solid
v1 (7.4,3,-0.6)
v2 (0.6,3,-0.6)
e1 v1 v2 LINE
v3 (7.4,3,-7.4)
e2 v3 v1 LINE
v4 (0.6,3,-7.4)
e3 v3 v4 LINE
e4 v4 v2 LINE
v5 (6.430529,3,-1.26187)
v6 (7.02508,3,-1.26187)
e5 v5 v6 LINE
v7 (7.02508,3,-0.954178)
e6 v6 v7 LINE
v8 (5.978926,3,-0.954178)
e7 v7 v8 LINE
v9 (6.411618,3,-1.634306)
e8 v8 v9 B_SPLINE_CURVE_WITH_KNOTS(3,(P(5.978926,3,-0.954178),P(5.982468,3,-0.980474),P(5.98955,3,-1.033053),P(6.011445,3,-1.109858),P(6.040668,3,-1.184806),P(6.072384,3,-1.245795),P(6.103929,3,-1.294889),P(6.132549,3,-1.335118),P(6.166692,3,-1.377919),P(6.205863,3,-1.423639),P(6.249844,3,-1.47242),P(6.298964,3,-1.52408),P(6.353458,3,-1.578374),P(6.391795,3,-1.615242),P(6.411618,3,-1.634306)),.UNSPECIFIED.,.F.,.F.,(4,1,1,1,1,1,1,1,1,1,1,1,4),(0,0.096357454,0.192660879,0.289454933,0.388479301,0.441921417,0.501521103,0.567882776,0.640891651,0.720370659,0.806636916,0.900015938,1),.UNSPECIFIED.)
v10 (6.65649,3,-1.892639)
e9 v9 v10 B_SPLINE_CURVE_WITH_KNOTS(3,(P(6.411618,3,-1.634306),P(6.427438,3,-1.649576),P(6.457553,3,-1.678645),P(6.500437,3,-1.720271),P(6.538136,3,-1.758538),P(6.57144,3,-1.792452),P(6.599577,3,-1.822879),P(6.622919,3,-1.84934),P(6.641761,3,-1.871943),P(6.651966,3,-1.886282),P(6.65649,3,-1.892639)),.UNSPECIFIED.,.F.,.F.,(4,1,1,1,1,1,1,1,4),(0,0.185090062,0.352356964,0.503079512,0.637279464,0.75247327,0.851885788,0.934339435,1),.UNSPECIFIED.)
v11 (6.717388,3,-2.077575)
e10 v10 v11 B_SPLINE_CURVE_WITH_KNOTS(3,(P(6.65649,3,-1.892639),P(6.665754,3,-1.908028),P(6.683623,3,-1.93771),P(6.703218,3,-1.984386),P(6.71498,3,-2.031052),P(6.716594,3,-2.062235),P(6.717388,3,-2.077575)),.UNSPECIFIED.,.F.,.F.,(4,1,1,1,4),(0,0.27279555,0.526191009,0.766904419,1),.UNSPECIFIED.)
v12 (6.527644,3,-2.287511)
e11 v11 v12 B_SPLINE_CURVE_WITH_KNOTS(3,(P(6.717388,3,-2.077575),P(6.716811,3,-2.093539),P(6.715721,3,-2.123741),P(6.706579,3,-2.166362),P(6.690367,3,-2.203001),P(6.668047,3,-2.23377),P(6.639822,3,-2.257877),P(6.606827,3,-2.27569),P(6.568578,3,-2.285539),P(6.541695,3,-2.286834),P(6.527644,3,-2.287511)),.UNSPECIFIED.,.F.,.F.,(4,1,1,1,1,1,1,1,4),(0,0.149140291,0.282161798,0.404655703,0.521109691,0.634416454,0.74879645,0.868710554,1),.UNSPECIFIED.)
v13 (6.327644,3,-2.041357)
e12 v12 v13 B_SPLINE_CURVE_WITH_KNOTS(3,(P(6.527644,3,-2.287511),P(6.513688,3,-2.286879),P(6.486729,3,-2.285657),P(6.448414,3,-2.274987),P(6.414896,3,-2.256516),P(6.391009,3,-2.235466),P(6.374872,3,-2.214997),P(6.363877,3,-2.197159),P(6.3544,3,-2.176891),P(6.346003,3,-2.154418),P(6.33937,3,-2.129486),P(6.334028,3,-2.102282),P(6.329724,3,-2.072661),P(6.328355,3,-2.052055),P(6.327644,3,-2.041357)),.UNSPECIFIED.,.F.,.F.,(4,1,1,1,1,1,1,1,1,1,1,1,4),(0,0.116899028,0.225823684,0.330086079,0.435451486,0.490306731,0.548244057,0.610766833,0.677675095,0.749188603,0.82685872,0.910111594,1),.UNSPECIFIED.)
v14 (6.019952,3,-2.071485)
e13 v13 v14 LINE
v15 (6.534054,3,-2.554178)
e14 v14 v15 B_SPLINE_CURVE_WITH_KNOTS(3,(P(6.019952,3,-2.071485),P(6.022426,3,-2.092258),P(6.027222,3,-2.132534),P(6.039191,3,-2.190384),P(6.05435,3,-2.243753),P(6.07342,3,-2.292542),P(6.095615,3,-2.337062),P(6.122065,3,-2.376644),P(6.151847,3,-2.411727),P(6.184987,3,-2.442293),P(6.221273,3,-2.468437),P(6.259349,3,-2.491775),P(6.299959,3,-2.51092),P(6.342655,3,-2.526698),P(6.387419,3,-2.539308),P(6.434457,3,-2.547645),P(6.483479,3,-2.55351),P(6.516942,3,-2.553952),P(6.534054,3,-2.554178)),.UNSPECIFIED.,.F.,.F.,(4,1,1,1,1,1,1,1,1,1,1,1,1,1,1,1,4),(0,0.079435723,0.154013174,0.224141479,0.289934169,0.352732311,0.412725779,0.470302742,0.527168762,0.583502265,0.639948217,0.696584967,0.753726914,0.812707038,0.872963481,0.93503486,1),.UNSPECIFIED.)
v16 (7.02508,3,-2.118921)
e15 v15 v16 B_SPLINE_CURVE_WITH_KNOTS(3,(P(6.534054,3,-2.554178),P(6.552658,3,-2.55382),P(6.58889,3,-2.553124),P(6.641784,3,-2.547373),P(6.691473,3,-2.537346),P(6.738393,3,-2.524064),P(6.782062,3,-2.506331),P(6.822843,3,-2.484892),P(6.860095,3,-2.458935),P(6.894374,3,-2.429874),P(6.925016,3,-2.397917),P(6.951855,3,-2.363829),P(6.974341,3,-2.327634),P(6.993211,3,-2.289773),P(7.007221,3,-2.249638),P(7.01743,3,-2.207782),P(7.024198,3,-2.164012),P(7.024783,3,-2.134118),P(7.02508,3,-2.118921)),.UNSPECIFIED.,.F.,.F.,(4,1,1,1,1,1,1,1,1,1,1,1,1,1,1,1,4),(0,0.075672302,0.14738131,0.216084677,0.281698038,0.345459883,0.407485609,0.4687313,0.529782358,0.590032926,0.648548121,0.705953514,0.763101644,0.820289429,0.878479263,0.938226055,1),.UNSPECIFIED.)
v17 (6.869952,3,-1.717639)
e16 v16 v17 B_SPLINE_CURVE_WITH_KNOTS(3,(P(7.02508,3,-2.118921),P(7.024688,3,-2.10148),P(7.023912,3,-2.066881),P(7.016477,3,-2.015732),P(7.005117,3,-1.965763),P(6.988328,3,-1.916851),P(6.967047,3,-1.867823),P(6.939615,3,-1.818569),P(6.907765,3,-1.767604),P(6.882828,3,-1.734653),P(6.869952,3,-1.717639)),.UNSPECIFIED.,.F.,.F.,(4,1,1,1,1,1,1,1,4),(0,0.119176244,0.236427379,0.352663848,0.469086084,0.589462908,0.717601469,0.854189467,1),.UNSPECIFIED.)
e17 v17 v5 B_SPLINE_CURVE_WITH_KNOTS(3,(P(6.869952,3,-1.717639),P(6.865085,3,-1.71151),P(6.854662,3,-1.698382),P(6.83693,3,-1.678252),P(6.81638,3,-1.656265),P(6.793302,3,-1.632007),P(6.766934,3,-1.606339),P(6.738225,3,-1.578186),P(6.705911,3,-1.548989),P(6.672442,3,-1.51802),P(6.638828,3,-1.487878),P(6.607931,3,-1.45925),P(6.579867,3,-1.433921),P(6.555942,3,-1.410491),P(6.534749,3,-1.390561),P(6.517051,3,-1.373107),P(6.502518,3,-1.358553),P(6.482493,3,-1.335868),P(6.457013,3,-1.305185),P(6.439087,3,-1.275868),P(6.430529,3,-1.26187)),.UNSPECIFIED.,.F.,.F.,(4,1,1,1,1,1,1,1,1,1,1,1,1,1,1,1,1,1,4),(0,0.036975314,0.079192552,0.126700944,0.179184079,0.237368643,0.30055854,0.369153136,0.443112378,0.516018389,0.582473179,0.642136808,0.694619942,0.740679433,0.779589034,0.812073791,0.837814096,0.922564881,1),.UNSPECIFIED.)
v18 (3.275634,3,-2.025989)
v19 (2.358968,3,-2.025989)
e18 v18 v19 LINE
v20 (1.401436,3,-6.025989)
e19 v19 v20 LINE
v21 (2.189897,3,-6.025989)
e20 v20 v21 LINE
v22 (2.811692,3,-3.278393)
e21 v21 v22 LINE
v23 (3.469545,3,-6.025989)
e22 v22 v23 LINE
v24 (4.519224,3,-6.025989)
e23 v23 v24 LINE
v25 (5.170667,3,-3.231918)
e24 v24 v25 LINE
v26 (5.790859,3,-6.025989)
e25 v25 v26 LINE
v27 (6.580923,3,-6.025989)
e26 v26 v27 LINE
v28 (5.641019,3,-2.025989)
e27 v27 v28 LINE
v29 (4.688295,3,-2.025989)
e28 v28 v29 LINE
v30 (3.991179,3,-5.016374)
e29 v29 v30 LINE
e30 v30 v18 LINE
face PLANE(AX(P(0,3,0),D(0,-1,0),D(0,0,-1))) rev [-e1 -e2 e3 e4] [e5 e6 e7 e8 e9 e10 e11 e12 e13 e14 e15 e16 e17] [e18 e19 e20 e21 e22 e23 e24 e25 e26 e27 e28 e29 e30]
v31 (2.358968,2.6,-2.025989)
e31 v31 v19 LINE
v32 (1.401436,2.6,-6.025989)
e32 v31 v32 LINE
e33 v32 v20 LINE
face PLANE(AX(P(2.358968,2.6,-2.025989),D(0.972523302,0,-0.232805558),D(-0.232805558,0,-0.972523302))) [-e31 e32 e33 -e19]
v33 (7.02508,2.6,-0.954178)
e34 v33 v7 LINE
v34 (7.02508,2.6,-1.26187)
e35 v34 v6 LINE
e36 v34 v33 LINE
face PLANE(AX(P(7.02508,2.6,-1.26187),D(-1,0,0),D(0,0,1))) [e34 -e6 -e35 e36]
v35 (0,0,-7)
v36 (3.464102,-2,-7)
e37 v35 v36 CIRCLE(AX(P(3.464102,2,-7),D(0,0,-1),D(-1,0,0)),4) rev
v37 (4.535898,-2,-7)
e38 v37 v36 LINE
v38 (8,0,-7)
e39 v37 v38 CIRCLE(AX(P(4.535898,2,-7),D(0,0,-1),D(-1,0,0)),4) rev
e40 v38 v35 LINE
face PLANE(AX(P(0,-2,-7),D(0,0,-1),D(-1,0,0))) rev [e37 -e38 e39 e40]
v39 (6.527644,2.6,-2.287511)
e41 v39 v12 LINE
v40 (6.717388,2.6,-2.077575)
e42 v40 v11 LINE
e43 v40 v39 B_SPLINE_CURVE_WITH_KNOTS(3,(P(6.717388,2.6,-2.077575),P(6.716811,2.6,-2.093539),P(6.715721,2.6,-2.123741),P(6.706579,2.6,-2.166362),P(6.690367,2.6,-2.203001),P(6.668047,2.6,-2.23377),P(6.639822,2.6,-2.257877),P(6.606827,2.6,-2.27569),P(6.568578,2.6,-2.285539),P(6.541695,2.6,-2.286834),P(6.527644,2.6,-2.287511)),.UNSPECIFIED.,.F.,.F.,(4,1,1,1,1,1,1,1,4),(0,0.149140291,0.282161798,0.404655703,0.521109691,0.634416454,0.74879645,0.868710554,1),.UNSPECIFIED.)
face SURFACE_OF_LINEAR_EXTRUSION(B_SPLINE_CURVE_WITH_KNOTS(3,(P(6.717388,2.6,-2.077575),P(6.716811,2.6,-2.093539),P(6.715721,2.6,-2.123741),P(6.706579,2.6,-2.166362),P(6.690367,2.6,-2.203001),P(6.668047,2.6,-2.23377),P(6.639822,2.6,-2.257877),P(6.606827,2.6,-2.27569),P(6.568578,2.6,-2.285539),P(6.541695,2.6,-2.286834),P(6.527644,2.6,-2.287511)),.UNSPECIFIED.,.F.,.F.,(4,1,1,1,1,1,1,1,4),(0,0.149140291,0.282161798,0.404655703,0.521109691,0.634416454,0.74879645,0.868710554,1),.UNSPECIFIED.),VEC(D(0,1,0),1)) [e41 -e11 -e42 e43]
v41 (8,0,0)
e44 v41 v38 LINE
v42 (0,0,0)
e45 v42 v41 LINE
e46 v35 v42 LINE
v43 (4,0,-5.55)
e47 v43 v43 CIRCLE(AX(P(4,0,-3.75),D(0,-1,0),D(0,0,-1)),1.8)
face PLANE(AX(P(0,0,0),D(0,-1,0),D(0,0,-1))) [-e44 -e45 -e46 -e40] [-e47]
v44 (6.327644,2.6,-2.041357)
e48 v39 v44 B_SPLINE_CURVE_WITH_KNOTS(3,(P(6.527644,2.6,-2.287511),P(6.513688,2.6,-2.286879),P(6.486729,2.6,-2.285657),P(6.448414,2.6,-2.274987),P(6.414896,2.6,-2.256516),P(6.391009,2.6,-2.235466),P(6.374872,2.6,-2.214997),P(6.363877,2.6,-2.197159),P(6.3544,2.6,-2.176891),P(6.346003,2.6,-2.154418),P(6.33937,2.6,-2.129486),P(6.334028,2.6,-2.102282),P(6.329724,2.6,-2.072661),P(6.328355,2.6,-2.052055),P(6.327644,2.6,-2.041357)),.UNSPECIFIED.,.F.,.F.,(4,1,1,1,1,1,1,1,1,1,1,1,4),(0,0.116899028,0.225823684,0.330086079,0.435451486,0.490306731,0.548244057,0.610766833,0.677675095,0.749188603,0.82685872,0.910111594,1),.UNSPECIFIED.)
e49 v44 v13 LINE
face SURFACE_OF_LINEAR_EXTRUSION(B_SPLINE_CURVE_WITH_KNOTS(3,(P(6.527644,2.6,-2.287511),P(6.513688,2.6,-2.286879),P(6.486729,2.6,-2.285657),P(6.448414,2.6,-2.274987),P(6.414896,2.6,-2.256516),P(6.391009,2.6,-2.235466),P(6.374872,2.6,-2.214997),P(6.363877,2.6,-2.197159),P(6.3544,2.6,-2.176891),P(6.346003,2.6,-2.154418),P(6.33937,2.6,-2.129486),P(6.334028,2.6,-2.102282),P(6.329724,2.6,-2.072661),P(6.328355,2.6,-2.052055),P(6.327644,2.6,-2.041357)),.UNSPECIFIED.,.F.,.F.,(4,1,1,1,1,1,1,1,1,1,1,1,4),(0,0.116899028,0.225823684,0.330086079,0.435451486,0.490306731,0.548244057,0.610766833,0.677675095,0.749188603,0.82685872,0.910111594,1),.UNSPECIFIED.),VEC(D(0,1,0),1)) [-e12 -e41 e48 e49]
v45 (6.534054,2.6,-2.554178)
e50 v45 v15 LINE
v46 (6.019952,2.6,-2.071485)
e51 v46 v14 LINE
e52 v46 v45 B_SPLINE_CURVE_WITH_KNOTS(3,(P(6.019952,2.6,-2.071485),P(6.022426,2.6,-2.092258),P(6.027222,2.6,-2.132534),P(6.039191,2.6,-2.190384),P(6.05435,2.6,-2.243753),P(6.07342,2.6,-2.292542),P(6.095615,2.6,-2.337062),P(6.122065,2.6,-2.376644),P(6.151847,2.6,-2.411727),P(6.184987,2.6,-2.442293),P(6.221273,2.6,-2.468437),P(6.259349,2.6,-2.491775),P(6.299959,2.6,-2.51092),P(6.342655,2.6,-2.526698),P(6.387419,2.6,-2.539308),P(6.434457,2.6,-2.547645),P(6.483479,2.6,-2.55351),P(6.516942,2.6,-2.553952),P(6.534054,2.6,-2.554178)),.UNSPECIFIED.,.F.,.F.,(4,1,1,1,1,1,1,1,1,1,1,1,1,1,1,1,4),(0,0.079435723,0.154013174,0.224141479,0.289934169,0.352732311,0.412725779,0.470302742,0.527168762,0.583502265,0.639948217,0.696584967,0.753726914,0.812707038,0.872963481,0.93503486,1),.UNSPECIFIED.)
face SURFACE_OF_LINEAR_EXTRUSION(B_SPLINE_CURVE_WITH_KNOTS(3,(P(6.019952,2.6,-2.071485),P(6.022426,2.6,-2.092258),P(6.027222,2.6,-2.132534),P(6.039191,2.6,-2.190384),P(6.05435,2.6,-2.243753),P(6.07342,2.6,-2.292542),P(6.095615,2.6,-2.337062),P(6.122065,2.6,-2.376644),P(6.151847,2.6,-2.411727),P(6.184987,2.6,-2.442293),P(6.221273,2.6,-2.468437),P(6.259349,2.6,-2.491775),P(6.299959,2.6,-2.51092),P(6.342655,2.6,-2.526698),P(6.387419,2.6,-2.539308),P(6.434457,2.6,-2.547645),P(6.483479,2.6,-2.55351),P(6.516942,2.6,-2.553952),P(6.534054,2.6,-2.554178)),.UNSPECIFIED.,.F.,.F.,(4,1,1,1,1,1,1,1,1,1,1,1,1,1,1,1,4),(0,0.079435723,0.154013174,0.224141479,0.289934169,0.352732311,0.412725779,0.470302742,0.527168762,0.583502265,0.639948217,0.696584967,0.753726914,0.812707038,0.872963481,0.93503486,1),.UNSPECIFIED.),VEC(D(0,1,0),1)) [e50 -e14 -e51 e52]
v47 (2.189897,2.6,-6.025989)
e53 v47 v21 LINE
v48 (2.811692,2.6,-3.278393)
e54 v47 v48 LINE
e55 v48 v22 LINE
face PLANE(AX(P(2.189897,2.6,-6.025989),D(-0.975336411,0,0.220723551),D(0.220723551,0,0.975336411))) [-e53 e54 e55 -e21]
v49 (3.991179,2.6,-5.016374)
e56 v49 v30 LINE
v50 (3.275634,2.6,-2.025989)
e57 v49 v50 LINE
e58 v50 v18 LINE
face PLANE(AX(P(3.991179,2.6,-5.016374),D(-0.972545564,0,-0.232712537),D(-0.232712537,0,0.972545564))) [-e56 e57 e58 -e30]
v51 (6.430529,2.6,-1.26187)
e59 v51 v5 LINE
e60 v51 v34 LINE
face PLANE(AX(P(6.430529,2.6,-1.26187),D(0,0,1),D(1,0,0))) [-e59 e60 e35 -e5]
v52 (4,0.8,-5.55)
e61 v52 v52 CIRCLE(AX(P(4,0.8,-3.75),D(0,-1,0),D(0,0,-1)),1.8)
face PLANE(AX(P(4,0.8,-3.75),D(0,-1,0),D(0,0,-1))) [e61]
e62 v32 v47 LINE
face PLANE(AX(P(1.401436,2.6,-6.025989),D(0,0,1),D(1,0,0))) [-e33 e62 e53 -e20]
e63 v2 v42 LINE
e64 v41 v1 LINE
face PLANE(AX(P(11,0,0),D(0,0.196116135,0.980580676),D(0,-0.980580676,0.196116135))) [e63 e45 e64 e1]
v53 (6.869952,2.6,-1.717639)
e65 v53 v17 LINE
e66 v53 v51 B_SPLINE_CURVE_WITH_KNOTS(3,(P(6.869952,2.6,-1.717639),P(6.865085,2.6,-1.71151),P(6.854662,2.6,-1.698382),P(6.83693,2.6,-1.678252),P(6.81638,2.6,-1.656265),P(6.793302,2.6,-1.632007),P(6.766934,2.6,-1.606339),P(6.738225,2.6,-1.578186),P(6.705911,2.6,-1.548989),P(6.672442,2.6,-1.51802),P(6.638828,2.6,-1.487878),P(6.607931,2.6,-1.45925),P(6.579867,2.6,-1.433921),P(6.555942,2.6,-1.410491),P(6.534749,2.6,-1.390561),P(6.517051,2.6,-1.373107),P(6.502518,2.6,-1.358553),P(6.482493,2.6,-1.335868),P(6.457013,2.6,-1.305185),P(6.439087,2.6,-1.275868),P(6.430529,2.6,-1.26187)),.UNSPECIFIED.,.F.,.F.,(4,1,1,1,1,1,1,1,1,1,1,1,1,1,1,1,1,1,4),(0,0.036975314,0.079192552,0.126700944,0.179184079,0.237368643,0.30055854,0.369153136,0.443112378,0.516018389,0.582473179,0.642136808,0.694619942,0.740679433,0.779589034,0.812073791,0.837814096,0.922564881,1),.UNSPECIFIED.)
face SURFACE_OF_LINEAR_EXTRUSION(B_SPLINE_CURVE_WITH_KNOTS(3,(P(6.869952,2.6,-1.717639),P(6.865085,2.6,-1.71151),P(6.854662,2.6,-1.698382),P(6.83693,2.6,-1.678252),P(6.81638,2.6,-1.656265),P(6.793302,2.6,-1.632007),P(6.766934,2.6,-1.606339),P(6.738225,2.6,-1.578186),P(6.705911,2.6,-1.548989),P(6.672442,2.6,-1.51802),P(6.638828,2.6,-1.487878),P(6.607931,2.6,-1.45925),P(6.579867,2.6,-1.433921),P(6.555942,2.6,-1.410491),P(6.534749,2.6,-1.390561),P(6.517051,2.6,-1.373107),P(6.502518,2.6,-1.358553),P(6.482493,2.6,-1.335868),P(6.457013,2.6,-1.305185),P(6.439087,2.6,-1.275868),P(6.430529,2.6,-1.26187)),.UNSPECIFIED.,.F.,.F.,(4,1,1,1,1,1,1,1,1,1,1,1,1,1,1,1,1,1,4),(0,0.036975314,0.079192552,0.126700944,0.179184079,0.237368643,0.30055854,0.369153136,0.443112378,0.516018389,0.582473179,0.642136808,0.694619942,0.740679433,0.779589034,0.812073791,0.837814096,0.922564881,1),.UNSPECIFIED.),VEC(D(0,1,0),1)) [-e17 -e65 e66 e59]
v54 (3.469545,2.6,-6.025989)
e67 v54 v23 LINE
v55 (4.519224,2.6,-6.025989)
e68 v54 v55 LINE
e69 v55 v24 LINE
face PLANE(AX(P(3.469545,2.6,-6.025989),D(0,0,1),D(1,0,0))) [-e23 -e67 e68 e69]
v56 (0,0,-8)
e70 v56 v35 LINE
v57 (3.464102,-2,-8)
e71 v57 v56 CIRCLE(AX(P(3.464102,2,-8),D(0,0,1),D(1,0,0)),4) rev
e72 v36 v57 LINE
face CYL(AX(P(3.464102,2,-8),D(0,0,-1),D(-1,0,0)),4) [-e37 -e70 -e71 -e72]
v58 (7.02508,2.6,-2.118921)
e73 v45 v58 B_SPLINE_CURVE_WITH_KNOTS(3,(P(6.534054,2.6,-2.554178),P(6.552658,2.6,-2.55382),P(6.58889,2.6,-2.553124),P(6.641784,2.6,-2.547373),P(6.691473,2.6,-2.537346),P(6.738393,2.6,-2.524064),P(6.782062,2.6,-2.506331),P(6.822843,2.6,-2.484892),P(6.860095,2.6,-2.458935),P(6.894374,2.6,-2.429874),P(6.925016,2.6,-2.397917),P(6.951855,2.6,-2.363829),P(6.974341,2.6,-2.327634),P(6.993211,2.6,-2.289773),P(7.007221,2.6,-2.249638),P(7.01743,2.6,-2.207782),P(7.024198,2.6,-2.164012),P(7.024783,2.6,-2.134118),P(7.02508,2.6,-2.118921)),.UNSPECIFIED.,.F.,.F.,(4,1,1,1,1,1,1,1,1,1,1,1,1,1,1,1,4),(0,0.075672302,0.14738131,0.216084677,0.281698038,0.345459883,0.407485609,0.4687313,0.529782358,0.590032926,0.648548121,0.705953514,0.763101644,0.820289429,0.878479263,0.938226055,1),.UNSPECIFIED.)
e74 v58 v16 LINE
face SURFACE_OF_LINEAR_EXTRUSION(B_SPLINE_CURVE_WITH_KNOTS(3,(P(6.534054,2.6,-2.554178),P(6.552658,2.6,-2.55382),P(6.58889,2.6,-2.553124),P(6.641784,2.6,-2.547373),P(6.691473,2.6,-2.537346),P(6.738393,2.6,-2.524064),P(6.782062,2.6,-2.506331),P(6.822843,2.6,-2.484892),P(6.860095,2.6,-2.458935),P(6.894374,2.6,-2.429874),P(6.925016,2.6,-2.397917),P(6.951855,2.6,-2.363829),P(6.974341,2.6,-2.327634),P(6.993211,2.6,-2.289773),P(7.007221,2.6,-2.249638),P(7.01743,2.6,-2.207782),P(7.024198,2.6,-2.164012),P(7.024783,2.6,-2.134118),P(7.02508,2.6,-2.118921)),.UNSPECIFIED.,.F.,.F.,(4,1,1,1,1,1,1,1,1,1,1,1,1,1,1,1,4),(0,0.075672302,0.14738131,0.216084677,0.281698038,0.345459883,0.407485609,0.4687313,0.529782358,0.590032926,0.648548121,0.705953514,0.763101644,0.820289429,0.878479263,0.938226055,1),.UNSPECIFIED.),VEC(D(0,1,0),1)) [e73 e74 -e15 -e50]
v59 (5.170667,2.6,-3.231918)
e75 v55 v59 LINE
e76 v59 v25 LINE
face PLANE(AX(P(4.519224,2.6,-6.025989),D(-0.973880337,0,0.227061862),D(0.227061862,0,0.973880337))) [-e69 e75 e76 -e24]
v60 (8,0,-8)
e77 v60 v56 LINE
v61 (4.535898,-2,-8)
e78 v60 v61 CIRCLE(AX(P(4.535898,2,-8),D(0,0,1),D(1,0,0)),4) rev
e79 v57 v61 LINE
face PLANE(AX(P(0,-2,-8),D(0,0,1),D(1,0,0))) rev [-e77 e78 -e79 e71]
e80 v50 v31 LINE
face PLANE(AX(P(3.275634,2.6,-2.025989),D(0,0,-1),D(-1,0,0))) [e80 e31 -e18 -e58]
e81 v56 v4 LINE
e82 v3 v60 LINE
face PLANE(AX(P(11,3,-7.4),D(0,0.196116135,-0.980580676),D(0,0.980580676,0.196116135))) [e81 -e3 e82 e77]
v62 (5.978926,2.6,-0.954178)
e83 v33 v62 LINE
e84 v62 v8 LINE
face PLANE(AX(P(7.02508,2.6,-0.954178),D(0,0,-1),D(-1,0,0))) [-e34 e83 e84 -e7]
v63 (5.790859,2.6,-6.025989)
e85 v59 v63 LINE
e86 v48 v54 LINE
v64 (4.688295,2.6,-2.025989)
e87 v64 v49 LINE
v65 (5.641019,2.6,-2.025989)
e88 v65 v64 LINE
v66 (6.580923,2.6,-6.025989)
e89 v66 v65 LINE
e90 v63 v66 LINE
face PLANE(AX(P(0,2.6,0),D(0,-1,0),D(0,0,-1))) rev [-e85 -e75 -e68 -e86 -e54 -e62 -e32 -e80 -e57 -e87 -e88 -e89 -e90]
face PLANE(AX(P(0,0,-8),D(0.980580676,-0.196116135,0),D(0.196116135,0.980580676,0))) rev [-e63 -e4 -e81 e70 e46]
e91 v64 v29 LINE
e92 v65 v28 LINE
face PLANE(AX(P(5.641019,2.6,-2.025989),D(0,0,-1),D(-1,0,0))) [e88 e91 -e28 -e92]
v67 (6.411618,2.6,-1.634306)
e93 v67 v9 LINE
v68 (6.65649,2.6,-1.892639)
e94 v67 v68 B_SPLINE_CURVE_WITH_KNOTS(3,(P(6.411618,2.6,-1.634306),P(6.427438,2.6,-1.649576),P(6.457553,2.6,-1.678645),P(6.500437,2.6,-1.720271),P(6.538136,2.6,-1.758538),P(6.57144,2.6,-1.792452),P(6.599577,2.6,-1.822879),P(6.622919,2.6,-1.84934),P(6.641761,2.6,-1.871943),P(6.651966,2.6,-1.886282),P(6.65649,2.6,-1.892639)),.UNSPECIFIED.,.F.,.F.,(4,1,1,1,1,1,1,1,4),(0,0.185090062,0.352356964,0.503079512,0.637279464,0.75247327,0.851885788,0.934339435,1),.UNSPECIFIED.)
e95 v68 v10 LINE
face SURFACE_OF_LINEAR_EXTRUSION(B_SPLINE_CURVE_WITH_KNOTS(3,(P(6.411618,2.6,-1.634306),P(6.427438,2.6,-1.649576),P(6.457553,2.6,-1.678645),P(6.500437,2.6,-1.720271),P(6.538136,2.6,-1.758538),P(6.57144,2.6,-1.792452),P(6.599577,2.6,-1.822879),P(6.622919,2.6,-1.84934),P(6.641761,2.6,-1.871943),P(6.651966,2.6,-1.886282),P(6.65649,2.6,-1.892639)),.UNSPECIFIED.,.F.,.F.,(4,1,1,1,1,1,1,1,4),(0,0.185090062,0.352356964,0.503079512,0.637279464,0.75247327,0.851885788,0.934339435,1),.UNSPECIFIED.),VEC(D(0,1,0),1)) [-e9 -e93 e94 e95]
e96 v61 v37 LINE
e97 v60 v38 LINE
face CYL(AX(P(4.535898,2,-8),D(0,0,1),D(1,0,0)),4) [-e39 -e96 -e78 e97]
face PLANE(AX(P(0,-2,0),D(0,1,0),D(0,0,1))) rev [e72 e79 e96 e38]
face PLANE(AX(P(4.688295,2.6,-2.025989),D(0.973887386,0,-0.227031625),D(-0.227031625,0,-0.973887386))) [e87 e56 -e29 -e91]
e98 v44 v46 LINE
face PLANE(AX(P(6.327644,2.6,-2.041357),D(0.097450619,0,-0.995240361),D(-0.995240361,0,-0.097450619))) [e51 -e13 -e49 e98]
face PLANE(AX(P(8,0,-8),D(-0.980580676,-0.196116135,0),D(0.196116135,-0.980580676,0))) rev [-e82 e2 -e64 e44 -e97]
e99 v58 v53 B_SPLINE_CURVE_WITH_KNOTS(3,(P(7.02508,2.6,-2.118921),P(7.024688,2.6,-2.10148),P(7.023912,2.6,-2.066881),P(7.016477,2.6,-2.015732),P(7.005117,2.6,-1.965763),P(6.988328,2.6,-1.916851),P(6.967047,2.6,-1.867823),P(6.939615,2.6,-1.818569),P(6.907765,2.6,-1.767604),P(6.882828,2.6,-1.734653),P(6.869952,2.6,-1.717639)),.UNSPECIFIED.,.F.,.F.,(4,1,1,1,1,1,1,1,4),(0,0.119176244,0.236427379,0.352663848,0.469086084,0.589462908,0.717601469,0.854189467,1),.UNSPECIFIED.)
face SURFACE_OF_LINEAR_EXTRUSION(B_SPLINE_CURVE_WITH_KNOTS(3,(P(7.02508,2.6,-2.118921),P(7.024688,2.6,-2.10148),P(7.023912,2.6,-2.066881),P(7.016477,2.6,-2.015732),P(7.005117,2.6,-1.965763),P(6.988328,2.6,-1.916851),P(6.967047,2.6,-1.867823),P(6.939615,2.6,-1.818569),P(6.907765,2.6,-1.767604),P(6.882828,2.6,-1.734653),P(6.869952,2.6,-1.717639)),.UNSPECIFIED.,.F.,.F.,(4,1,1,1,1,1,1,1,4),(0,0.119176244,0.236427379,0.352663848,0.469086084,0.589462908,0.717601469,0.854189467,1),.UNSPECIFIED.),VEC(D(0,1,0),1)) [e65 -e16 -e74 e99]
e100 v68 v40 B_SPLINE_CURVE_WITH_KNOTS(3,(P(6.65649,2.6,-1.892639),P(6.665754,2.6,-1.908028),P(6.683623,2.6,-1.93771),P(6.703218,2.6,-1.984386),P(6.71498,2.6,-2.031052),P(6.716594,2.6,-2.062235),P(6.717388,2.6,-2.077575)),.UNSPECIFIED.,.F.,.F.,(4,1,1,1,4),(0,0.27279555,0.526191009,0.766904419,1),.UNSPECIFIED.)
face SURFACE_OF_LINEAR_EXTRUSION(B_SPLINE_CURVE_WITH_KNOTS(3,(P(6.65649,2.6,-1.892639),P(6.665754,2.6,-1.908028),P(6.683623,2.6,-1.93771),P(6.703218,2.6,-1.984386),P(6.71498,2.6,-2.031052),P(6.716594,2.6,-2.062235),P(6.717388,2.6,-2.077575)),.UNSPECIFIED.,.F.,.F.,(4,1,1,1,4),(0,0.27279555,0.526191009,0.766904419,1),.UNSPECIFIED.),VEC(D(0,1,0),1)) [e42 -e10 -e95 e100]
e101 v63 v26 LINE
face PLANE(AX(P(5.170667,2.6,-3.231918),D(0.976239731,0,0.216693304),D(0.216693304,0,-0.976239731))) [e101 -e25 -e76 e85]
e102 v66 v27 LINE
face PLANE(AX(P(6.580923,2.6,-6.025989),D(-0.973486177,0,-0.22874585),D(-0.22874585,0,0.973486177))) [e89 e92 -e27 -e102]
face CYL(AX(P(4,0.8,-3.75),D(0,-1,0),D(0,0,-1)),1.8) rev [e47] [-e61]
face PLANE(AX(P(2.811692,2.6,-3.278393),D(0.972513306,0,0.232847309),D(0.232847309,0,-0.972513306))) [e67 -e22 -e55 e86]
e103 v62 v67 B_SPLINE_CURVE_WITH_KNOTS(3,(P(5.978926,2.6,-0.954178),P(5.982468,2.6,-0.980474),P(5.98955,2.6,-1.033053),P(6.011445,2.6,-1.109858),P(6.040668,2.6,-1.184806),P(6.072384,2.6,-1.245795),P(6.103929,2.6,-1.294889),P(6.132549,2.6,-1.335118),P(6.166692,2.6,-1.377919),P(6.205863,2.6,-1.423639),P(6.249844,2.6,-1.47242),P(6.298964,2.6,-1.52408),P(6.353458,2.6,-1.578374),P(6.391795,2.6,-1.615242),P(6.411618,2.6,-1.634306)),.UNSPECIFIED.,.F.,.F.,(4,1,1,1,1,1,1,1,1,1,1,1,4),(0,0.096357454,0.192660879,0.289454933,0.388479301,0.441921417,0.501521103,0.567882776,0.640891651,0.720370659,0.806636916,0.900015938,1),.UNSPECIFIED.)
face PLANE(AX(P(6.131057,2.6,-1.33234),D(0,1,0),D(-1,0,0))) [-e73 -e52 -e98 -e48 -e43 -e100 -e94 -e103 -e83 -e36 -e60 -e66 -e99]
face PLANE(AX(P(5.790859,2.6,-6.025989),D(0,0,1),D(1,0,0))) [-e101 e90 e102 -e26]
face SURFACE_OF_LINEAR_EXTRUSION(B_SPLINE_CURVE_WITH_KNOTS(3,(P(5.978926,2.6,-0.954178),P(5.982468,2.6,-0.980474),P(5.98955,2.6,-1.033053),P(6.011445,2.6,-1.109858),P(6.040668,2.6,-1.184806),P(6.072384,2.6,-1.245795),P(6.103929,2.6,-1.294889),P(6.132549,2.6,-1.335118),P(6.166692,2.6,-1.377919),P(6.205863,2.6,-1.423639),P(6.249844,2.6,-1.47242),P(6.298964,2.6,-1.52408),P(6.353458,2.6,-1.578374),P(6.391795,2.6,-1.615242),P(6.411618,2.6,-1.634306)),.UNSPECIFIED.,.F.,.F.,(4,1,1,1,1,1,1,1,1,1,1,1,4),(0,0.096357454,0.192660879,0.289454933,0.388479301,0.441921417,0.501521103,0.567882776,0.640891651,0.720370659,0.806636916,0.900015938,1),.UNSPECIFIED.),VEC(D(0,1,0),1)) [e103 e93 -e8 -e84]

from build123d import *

# Parameters (mm, degrees)
SKETCH1_W               = 8
SKETCH1_H               = 8
BOSS_EXTRUDE1_DEPTH     = 3
CUT_EXTRUDE1_DEPTH      = 12.704699911
CUT_EXTRUDE1_DEPTH_BACK = 12.704699911
CUT_EXTRUDE2_DEPTH      = 11
SKETCH4_R               = 1.8
CUT_EXTRUDE3_DEPTH      = 0.8
SKETCH5_W               = 8
SKETCH5_H               = 1
BOSS_EXTRUDE2_DEPTH     = 2
FILLET1_R               = 4
CUT_EXTRUDE4_DEPTH      = 0.4
CUT_EXTRUDE5_DEPTH      = 0.4


with BuildPart() as part:
    # Sketch1 → Boss-Extrude1 (new body)
    with BuildSketch(Plane(origin=(0, 0, 0), x_dir=(1, 0, 0), z_dir=(0, 1, 0))):
        with Locations((4, 4)):
            Rectangle(SKETCH1_W, SKETCH1_H)
    extrude(amount=BOSS_EXTRUDE1_DEPTH)

    # Sketch2 → Cut-Extrude1 (cut, two sides: drawn at the far end of the back side and taken through both)
    with BuildSketch(Plane.XY.offset(-CUT_EXTRUDE1_DEPTH_BACK)):
        Polygon((0, 0), (0.6, 3), (0, 3), align=None)
        Polygon((8, 0), (7.4, 3), (8, 3), align=None)
    extrude(amount=CUT_EXTRUDE1_DEPTH + CUT_EXTRUDE1_DEPTH_BACK, mode=Mode.SUBTRACT)

    # Sketch3 → Cut-Extrude2 (cut)
    with BuildSketch(Plane(origin=(0, 0, 0), x_dir=(0, 0, -1), z_dir=(1, 0, 0))):
        Polygon((0, 0), (0.6, 3), (0, 3), align=None)
        Polygon((8, 3), (7.4, 3), (8, 0), align=None)
    extrude(amount=CUT_EXTRUDE2_DEPTH, mode=Mode.SUBTRACT)

    # Sketch4 → Cut-Extrude3 (cut)
    with BuildSketch(Plane.XZ):
        with Locations(Location((4, -3.75, 0), (0, 0, 270))):
            Circle(SKETCH4_R)
    extrude(amount=-CUT_EXTRUDE3_DEPTH, mode=Mode.SUBTRACT)

    # Sketch5 → Boss-Extrude2 (add)
    with BuildSketch(Plane.XZ):
        with Locations((4, -7.5)):
            Rectangle(SKETCH5_W, SKETCH5_H)
    extrude(amount=BOSS_EXTRUDE2_DEPTH)

    # Fillet1
    # the kernel refuses this fillet: 4 mm, written as the material it takes off along each edge
    with BuildSketch(Plane(origin=(8, -2, -16.660254038), x_dir=(0, 1, 0), z_dir=(0, 0, 1)), Plane(origin=(0, -2, 1.660254038), x_dir=(0, 1, 0), z_dir=(0, 0, -1))) as fillet1_piece_1:
        with BuildLine():
            CenterArc((4, 3.464101615), FILLET1_R, 180, 60)
            Line((0, 3.464101615), (-0.08, 3.464101615))
            Line((-0.08, 3.464101615), (-0.08, 0))
            Line((-0.08, 0), (0, -0.08))
            ThreePointArc((0, -0.08), (1, -0.08), (1.96, -0.069282032))
            Line((1.96, -0.069282032), (2, 0))
        make_face()
    extrude(amount=18.320508076, mode=Mode.SUBTRACT)

    # Sketch6 → Cut-Extrude4 (cut)
    with BuildSketch(Plane(origin=(0, 3, 0), x_dir=(1, 0, 0), z_dir=(0, 1, 0))):
        Polygon((2.358967796, 2.025988971), (1.401435745, 6.025988971), (2.189897284, 6.025988971), (2.811692155, 3.278392817), (3.469544719, 6.025988971), (4.519224207, 6.025988971), (5.170666514, 3.231918458), (5.790858822, 6.025988971), (6.580922925, 6.025988971), (5.641019078, 2.025988971), (4.688294719, 2.025988971), (3.991179335, 5.016373586), (3.275634463, 2.025988971), align=None)
    extrude(amount=-CUT_EXTRUDE4_DEPTH, mode=Mode.SUBTRACT)

    # Sketch7 → Cut-Extrude5 (cut)
    with BuildSketch(Plane(origin=(0, 3, 0), x_dir=(1, 0, 0), z_dir=(0, 1, 0))):
        with BuildLine():
            Line((7.025079926, 1.261869909), (7.025079926, 0.954177602))
            Line((7.025079926, 0.954177602), (5.978926079, 0.954177602))
            add(Edge.make_bspline(
                [(5.978926079, 0.954177602), (5.982468114, 0.980474374), (5.989550197, 1.033053173), (6.011445466, 1.109857564), (6.040668149, 1.184805528), (6.072383822, 1.245794978), (6.103928572, 1.294889387), (6.132549124, 1.335117725), (6.166692393, 1.37791895), (6.205862922, 1.423638586), (6.249844239, 1.472419552), (6.298964472, 1.524080492), (6.353457933, 1.578374089), (6.391795053, 1.615242112), (6.411618387, 1.634305807)],
                knots=[0, 0, 0, 0, 1.156289446, 2.311930546, 3.473459201, 4.661751613, 5.303057008, 6.018253237, 6.81459331, 7.690699809, 8.644447906, 9.679642995, 10.800191253, 12, 12, 12, 12], degree=3))
            add(Edge.make_bspline(
                [(6.411618387, 1.634305807), (6.427437635, 1.649575712), (6.457552822, 1.678645113), (6.500436909, 1.720271317), (6.538136439, 1.758537631), (6.571439659, 1.79245241), (6.599577217, 1.822879209), (6.622919237, 1.849340182), (6.641761343, 1.871943086), (6.651966244, 1.886282382), (6.656490182, 1.89263914)],
                knots=[0, 0, 0, 0, 1.480720495, 2.818855715, 4.024636094, 5.098235712, 6.019786162, 6.815086302, 7.474715479, 8, 8, 8, 8], degree=3))
            add(Edge.make_bspline(
                [(6.656490182, 1.89263914), (6.665754103, 1.908027503), (6.683623134, 1.937709873), (6.703218009, 1.984385935), (6.714979583, 2.031052356), (6.71659359, 2.062234592), (6.717387618, 2.077575038)],
                knots=[0, 0, 0, 0, 1.0911822, 2.104764037, 3.067617678, 4, 4, 4, 4], degree=3))
            add(Edge.make_bspline(
                [(6.717387618, 2.077575038), (6.716811351, 2.093538834), (6.7157211, 2.123741092), (6.706579153, 2.166362064), (6.690367393, 2.203000826), (6.668046783, 2.233769843), (6.639822327, 2.257877251), (6.606827118, 2.275690284), (6.568578157, 2.285538571), (6.541694532, 2.286833928), (6.527644028, 2.287510935)],
                knots=[0, 0, 0, 0, 1.193122327, 2.257294386, 3.237245624, 4.168877528, 5.075331632, 5.990371598, 6.949684428, 8, 8, 8, 8], degree=3))
            add(Edge.make_bspline(
                [(6.527644028, 2.287510935), (6.513688449, 2.286878661), (6.486729282, 2.285657243), (6.448414457, 2.274987105), (6.414896057, 2.256515974), (6.391009062, 2.235466338), (6.374872264, 2.214997095), (6.363877213, 2.197159499), (6.354400337, 2.17689052), (6.346003035, 2.154418352), (6.339370115, 2.129485554), (6.334028373, 2.102282013), (6.329723702, 2.072661336), (6.328354741, 2.052055079), (6.327644028, 2.041357089)],
                knots=[0, 0, 0, 0, 1.402788338, 2.709884207, 3.961032948, 5.225417836, 5.883680772, 6.578928686, 7.329201998, 8.132101139, 8.990263233, 9.922304639, 10.921339128, 12, 12, 12, 12], degree=3))
            Line((6.327644028, 2.041357089), (6.01995172, 2.071485294))
            add(Edge.make_bspline(
                [(6.01995172, 2.071485294), (6.022425519, 2.092258403), (6.027221819, 2.132534142), (6.039191066, 2.190383991), (6.054349674, 2.243753088), (6.073420305, 2.292542389), (6.095614746, 2.337062147), (6.122065099, 2.376644317), (6.15184716, 2.411727355), (6.184986668, 2.44229259), (6.221272944, 2.468437258), (6.259348879, 2.491775386), (6.299958585, 2.510920071), (6.342654946, 2.526698167), (6.387418668, 2.539307895), (6.434456788, 2.547645276), (6.483479006, 2.553509822), (6.516941776, 2.553951654), (6.534054285, 2.554177602)],
                knots=[0, 0, 0, 0, 1.270971563, 2.464210789, 3.586263665, 4.638946707, 5.643716971, 6.603612468, 7.52484387, 8.434700188, 9.336036235, 10.239171475, 11.145359471, 12.059630629, 13.003312604, 13.96741569, 14.960557767, 16, 16, 16, 16], degree=3))
            add(Edge.make_bspline(
                [(6.534054285, 2.554177602), (6.552657792, 2.553820052), (6.58889046, 2.553123679), (6.641783721, 2.547373025), (6.69147314, 2.537345926), (6.738393137, 2.524063615), (6.782061867, 2.506330758), (6.82284322, 2.484892472), (6.860095371, 2.458935129), (6.894373612, 2.429874295), (6.925015616, 2.397916799), (6.95185524, 2.363828728), (6.974341388, 2.327633829), (6.993210719, 2.289773279), (7.007221071, 2.249637846), (7.017429622, 2.207782494), (7.024198302, 2.164011958), (7.024782801, 2.134117674), (7.025079926, 2.118921192)],
                knots=[0, 0, 0, 0, 1.210756838, 2.35810096, 3.457354827, 4.507168606, 5.527358126, 6.519769748, 7.499700793, 8.476517721, 9.440526811, 10.376769937, 11.295256217, 12.209626307, 13.124630862, 14.055668209, 15.011616881, 16, 16, 16, 16], degree=3))
            add(Edge.make_bspline(
                [(7.025079926, 2.118921192), (7.024688468, 2.101480457), (7.023911876, 2.066880717), (7.016476584, 2.015731964), (7.005116907, 1.965762694), (6.988328197, 1.916850789), (6.967047205, 1.867822963), (6.939615495, 1.818569171), (6.907765206, 1.767604004), (6.882827684, 1.7346528), (6.86995172, 1.71763914)],
                knots=[0, 0, 0, 0, 0.953409949, 1.89141903, 2.821310783, 3.752688675, 4.715703262, 5.740811754, 6.833515735, 8, 8, 8, 8], degree=3))
            add(Edge.make_bspline(
                [(6.86995172, 1.71763914), (6.865085171, 1.711509707), (6.854662151, 1.698381883), (6.836929855, 1.678252394), (6.816379649, 1.656264646), (6.793301796, 1.632007081), (6.766933989, 1.606338723), (6.738224942, 1.578186143), (6.705911376, 1.548989439), (6.672442351, 1.518020294), (6.638827847, 1.487878461), (6.607931272, 1.459250402), (6.579866901, 1.433920718), (6.555941744, 1.410491095), (6.534748531, 1.390560588), (6.517051134, 1.373107183), (6.502518393, 1.358553413), (6.482493212, 1.335867777), (6.457013442, 1.305185447), (6.439087381, 1.275867612), (6.430528644, 1.261869909)],
                knots=[0, 0, 0, 0, 0.665555651, 1.425465941, 2.280616993, 3.225313414, 4.272635571, 5.410053715, 6.644756443, 7.976022804, 9.288331007, 10.484517221, 11.558462543, 12.503158964, 13.33222979, 14.032602617, 14.617328242, 15.080653724, 16.606167857, 18, 18, 18, 18], degree=3))
            Line((6.430528644, 1.261869909), (7.025079926, 1.261869909))
        make_face()
    extrude(amount=-CUT_EXTRUDE5_DEPTH, mode=Mode.SUBTRACT)


solid = part.part
